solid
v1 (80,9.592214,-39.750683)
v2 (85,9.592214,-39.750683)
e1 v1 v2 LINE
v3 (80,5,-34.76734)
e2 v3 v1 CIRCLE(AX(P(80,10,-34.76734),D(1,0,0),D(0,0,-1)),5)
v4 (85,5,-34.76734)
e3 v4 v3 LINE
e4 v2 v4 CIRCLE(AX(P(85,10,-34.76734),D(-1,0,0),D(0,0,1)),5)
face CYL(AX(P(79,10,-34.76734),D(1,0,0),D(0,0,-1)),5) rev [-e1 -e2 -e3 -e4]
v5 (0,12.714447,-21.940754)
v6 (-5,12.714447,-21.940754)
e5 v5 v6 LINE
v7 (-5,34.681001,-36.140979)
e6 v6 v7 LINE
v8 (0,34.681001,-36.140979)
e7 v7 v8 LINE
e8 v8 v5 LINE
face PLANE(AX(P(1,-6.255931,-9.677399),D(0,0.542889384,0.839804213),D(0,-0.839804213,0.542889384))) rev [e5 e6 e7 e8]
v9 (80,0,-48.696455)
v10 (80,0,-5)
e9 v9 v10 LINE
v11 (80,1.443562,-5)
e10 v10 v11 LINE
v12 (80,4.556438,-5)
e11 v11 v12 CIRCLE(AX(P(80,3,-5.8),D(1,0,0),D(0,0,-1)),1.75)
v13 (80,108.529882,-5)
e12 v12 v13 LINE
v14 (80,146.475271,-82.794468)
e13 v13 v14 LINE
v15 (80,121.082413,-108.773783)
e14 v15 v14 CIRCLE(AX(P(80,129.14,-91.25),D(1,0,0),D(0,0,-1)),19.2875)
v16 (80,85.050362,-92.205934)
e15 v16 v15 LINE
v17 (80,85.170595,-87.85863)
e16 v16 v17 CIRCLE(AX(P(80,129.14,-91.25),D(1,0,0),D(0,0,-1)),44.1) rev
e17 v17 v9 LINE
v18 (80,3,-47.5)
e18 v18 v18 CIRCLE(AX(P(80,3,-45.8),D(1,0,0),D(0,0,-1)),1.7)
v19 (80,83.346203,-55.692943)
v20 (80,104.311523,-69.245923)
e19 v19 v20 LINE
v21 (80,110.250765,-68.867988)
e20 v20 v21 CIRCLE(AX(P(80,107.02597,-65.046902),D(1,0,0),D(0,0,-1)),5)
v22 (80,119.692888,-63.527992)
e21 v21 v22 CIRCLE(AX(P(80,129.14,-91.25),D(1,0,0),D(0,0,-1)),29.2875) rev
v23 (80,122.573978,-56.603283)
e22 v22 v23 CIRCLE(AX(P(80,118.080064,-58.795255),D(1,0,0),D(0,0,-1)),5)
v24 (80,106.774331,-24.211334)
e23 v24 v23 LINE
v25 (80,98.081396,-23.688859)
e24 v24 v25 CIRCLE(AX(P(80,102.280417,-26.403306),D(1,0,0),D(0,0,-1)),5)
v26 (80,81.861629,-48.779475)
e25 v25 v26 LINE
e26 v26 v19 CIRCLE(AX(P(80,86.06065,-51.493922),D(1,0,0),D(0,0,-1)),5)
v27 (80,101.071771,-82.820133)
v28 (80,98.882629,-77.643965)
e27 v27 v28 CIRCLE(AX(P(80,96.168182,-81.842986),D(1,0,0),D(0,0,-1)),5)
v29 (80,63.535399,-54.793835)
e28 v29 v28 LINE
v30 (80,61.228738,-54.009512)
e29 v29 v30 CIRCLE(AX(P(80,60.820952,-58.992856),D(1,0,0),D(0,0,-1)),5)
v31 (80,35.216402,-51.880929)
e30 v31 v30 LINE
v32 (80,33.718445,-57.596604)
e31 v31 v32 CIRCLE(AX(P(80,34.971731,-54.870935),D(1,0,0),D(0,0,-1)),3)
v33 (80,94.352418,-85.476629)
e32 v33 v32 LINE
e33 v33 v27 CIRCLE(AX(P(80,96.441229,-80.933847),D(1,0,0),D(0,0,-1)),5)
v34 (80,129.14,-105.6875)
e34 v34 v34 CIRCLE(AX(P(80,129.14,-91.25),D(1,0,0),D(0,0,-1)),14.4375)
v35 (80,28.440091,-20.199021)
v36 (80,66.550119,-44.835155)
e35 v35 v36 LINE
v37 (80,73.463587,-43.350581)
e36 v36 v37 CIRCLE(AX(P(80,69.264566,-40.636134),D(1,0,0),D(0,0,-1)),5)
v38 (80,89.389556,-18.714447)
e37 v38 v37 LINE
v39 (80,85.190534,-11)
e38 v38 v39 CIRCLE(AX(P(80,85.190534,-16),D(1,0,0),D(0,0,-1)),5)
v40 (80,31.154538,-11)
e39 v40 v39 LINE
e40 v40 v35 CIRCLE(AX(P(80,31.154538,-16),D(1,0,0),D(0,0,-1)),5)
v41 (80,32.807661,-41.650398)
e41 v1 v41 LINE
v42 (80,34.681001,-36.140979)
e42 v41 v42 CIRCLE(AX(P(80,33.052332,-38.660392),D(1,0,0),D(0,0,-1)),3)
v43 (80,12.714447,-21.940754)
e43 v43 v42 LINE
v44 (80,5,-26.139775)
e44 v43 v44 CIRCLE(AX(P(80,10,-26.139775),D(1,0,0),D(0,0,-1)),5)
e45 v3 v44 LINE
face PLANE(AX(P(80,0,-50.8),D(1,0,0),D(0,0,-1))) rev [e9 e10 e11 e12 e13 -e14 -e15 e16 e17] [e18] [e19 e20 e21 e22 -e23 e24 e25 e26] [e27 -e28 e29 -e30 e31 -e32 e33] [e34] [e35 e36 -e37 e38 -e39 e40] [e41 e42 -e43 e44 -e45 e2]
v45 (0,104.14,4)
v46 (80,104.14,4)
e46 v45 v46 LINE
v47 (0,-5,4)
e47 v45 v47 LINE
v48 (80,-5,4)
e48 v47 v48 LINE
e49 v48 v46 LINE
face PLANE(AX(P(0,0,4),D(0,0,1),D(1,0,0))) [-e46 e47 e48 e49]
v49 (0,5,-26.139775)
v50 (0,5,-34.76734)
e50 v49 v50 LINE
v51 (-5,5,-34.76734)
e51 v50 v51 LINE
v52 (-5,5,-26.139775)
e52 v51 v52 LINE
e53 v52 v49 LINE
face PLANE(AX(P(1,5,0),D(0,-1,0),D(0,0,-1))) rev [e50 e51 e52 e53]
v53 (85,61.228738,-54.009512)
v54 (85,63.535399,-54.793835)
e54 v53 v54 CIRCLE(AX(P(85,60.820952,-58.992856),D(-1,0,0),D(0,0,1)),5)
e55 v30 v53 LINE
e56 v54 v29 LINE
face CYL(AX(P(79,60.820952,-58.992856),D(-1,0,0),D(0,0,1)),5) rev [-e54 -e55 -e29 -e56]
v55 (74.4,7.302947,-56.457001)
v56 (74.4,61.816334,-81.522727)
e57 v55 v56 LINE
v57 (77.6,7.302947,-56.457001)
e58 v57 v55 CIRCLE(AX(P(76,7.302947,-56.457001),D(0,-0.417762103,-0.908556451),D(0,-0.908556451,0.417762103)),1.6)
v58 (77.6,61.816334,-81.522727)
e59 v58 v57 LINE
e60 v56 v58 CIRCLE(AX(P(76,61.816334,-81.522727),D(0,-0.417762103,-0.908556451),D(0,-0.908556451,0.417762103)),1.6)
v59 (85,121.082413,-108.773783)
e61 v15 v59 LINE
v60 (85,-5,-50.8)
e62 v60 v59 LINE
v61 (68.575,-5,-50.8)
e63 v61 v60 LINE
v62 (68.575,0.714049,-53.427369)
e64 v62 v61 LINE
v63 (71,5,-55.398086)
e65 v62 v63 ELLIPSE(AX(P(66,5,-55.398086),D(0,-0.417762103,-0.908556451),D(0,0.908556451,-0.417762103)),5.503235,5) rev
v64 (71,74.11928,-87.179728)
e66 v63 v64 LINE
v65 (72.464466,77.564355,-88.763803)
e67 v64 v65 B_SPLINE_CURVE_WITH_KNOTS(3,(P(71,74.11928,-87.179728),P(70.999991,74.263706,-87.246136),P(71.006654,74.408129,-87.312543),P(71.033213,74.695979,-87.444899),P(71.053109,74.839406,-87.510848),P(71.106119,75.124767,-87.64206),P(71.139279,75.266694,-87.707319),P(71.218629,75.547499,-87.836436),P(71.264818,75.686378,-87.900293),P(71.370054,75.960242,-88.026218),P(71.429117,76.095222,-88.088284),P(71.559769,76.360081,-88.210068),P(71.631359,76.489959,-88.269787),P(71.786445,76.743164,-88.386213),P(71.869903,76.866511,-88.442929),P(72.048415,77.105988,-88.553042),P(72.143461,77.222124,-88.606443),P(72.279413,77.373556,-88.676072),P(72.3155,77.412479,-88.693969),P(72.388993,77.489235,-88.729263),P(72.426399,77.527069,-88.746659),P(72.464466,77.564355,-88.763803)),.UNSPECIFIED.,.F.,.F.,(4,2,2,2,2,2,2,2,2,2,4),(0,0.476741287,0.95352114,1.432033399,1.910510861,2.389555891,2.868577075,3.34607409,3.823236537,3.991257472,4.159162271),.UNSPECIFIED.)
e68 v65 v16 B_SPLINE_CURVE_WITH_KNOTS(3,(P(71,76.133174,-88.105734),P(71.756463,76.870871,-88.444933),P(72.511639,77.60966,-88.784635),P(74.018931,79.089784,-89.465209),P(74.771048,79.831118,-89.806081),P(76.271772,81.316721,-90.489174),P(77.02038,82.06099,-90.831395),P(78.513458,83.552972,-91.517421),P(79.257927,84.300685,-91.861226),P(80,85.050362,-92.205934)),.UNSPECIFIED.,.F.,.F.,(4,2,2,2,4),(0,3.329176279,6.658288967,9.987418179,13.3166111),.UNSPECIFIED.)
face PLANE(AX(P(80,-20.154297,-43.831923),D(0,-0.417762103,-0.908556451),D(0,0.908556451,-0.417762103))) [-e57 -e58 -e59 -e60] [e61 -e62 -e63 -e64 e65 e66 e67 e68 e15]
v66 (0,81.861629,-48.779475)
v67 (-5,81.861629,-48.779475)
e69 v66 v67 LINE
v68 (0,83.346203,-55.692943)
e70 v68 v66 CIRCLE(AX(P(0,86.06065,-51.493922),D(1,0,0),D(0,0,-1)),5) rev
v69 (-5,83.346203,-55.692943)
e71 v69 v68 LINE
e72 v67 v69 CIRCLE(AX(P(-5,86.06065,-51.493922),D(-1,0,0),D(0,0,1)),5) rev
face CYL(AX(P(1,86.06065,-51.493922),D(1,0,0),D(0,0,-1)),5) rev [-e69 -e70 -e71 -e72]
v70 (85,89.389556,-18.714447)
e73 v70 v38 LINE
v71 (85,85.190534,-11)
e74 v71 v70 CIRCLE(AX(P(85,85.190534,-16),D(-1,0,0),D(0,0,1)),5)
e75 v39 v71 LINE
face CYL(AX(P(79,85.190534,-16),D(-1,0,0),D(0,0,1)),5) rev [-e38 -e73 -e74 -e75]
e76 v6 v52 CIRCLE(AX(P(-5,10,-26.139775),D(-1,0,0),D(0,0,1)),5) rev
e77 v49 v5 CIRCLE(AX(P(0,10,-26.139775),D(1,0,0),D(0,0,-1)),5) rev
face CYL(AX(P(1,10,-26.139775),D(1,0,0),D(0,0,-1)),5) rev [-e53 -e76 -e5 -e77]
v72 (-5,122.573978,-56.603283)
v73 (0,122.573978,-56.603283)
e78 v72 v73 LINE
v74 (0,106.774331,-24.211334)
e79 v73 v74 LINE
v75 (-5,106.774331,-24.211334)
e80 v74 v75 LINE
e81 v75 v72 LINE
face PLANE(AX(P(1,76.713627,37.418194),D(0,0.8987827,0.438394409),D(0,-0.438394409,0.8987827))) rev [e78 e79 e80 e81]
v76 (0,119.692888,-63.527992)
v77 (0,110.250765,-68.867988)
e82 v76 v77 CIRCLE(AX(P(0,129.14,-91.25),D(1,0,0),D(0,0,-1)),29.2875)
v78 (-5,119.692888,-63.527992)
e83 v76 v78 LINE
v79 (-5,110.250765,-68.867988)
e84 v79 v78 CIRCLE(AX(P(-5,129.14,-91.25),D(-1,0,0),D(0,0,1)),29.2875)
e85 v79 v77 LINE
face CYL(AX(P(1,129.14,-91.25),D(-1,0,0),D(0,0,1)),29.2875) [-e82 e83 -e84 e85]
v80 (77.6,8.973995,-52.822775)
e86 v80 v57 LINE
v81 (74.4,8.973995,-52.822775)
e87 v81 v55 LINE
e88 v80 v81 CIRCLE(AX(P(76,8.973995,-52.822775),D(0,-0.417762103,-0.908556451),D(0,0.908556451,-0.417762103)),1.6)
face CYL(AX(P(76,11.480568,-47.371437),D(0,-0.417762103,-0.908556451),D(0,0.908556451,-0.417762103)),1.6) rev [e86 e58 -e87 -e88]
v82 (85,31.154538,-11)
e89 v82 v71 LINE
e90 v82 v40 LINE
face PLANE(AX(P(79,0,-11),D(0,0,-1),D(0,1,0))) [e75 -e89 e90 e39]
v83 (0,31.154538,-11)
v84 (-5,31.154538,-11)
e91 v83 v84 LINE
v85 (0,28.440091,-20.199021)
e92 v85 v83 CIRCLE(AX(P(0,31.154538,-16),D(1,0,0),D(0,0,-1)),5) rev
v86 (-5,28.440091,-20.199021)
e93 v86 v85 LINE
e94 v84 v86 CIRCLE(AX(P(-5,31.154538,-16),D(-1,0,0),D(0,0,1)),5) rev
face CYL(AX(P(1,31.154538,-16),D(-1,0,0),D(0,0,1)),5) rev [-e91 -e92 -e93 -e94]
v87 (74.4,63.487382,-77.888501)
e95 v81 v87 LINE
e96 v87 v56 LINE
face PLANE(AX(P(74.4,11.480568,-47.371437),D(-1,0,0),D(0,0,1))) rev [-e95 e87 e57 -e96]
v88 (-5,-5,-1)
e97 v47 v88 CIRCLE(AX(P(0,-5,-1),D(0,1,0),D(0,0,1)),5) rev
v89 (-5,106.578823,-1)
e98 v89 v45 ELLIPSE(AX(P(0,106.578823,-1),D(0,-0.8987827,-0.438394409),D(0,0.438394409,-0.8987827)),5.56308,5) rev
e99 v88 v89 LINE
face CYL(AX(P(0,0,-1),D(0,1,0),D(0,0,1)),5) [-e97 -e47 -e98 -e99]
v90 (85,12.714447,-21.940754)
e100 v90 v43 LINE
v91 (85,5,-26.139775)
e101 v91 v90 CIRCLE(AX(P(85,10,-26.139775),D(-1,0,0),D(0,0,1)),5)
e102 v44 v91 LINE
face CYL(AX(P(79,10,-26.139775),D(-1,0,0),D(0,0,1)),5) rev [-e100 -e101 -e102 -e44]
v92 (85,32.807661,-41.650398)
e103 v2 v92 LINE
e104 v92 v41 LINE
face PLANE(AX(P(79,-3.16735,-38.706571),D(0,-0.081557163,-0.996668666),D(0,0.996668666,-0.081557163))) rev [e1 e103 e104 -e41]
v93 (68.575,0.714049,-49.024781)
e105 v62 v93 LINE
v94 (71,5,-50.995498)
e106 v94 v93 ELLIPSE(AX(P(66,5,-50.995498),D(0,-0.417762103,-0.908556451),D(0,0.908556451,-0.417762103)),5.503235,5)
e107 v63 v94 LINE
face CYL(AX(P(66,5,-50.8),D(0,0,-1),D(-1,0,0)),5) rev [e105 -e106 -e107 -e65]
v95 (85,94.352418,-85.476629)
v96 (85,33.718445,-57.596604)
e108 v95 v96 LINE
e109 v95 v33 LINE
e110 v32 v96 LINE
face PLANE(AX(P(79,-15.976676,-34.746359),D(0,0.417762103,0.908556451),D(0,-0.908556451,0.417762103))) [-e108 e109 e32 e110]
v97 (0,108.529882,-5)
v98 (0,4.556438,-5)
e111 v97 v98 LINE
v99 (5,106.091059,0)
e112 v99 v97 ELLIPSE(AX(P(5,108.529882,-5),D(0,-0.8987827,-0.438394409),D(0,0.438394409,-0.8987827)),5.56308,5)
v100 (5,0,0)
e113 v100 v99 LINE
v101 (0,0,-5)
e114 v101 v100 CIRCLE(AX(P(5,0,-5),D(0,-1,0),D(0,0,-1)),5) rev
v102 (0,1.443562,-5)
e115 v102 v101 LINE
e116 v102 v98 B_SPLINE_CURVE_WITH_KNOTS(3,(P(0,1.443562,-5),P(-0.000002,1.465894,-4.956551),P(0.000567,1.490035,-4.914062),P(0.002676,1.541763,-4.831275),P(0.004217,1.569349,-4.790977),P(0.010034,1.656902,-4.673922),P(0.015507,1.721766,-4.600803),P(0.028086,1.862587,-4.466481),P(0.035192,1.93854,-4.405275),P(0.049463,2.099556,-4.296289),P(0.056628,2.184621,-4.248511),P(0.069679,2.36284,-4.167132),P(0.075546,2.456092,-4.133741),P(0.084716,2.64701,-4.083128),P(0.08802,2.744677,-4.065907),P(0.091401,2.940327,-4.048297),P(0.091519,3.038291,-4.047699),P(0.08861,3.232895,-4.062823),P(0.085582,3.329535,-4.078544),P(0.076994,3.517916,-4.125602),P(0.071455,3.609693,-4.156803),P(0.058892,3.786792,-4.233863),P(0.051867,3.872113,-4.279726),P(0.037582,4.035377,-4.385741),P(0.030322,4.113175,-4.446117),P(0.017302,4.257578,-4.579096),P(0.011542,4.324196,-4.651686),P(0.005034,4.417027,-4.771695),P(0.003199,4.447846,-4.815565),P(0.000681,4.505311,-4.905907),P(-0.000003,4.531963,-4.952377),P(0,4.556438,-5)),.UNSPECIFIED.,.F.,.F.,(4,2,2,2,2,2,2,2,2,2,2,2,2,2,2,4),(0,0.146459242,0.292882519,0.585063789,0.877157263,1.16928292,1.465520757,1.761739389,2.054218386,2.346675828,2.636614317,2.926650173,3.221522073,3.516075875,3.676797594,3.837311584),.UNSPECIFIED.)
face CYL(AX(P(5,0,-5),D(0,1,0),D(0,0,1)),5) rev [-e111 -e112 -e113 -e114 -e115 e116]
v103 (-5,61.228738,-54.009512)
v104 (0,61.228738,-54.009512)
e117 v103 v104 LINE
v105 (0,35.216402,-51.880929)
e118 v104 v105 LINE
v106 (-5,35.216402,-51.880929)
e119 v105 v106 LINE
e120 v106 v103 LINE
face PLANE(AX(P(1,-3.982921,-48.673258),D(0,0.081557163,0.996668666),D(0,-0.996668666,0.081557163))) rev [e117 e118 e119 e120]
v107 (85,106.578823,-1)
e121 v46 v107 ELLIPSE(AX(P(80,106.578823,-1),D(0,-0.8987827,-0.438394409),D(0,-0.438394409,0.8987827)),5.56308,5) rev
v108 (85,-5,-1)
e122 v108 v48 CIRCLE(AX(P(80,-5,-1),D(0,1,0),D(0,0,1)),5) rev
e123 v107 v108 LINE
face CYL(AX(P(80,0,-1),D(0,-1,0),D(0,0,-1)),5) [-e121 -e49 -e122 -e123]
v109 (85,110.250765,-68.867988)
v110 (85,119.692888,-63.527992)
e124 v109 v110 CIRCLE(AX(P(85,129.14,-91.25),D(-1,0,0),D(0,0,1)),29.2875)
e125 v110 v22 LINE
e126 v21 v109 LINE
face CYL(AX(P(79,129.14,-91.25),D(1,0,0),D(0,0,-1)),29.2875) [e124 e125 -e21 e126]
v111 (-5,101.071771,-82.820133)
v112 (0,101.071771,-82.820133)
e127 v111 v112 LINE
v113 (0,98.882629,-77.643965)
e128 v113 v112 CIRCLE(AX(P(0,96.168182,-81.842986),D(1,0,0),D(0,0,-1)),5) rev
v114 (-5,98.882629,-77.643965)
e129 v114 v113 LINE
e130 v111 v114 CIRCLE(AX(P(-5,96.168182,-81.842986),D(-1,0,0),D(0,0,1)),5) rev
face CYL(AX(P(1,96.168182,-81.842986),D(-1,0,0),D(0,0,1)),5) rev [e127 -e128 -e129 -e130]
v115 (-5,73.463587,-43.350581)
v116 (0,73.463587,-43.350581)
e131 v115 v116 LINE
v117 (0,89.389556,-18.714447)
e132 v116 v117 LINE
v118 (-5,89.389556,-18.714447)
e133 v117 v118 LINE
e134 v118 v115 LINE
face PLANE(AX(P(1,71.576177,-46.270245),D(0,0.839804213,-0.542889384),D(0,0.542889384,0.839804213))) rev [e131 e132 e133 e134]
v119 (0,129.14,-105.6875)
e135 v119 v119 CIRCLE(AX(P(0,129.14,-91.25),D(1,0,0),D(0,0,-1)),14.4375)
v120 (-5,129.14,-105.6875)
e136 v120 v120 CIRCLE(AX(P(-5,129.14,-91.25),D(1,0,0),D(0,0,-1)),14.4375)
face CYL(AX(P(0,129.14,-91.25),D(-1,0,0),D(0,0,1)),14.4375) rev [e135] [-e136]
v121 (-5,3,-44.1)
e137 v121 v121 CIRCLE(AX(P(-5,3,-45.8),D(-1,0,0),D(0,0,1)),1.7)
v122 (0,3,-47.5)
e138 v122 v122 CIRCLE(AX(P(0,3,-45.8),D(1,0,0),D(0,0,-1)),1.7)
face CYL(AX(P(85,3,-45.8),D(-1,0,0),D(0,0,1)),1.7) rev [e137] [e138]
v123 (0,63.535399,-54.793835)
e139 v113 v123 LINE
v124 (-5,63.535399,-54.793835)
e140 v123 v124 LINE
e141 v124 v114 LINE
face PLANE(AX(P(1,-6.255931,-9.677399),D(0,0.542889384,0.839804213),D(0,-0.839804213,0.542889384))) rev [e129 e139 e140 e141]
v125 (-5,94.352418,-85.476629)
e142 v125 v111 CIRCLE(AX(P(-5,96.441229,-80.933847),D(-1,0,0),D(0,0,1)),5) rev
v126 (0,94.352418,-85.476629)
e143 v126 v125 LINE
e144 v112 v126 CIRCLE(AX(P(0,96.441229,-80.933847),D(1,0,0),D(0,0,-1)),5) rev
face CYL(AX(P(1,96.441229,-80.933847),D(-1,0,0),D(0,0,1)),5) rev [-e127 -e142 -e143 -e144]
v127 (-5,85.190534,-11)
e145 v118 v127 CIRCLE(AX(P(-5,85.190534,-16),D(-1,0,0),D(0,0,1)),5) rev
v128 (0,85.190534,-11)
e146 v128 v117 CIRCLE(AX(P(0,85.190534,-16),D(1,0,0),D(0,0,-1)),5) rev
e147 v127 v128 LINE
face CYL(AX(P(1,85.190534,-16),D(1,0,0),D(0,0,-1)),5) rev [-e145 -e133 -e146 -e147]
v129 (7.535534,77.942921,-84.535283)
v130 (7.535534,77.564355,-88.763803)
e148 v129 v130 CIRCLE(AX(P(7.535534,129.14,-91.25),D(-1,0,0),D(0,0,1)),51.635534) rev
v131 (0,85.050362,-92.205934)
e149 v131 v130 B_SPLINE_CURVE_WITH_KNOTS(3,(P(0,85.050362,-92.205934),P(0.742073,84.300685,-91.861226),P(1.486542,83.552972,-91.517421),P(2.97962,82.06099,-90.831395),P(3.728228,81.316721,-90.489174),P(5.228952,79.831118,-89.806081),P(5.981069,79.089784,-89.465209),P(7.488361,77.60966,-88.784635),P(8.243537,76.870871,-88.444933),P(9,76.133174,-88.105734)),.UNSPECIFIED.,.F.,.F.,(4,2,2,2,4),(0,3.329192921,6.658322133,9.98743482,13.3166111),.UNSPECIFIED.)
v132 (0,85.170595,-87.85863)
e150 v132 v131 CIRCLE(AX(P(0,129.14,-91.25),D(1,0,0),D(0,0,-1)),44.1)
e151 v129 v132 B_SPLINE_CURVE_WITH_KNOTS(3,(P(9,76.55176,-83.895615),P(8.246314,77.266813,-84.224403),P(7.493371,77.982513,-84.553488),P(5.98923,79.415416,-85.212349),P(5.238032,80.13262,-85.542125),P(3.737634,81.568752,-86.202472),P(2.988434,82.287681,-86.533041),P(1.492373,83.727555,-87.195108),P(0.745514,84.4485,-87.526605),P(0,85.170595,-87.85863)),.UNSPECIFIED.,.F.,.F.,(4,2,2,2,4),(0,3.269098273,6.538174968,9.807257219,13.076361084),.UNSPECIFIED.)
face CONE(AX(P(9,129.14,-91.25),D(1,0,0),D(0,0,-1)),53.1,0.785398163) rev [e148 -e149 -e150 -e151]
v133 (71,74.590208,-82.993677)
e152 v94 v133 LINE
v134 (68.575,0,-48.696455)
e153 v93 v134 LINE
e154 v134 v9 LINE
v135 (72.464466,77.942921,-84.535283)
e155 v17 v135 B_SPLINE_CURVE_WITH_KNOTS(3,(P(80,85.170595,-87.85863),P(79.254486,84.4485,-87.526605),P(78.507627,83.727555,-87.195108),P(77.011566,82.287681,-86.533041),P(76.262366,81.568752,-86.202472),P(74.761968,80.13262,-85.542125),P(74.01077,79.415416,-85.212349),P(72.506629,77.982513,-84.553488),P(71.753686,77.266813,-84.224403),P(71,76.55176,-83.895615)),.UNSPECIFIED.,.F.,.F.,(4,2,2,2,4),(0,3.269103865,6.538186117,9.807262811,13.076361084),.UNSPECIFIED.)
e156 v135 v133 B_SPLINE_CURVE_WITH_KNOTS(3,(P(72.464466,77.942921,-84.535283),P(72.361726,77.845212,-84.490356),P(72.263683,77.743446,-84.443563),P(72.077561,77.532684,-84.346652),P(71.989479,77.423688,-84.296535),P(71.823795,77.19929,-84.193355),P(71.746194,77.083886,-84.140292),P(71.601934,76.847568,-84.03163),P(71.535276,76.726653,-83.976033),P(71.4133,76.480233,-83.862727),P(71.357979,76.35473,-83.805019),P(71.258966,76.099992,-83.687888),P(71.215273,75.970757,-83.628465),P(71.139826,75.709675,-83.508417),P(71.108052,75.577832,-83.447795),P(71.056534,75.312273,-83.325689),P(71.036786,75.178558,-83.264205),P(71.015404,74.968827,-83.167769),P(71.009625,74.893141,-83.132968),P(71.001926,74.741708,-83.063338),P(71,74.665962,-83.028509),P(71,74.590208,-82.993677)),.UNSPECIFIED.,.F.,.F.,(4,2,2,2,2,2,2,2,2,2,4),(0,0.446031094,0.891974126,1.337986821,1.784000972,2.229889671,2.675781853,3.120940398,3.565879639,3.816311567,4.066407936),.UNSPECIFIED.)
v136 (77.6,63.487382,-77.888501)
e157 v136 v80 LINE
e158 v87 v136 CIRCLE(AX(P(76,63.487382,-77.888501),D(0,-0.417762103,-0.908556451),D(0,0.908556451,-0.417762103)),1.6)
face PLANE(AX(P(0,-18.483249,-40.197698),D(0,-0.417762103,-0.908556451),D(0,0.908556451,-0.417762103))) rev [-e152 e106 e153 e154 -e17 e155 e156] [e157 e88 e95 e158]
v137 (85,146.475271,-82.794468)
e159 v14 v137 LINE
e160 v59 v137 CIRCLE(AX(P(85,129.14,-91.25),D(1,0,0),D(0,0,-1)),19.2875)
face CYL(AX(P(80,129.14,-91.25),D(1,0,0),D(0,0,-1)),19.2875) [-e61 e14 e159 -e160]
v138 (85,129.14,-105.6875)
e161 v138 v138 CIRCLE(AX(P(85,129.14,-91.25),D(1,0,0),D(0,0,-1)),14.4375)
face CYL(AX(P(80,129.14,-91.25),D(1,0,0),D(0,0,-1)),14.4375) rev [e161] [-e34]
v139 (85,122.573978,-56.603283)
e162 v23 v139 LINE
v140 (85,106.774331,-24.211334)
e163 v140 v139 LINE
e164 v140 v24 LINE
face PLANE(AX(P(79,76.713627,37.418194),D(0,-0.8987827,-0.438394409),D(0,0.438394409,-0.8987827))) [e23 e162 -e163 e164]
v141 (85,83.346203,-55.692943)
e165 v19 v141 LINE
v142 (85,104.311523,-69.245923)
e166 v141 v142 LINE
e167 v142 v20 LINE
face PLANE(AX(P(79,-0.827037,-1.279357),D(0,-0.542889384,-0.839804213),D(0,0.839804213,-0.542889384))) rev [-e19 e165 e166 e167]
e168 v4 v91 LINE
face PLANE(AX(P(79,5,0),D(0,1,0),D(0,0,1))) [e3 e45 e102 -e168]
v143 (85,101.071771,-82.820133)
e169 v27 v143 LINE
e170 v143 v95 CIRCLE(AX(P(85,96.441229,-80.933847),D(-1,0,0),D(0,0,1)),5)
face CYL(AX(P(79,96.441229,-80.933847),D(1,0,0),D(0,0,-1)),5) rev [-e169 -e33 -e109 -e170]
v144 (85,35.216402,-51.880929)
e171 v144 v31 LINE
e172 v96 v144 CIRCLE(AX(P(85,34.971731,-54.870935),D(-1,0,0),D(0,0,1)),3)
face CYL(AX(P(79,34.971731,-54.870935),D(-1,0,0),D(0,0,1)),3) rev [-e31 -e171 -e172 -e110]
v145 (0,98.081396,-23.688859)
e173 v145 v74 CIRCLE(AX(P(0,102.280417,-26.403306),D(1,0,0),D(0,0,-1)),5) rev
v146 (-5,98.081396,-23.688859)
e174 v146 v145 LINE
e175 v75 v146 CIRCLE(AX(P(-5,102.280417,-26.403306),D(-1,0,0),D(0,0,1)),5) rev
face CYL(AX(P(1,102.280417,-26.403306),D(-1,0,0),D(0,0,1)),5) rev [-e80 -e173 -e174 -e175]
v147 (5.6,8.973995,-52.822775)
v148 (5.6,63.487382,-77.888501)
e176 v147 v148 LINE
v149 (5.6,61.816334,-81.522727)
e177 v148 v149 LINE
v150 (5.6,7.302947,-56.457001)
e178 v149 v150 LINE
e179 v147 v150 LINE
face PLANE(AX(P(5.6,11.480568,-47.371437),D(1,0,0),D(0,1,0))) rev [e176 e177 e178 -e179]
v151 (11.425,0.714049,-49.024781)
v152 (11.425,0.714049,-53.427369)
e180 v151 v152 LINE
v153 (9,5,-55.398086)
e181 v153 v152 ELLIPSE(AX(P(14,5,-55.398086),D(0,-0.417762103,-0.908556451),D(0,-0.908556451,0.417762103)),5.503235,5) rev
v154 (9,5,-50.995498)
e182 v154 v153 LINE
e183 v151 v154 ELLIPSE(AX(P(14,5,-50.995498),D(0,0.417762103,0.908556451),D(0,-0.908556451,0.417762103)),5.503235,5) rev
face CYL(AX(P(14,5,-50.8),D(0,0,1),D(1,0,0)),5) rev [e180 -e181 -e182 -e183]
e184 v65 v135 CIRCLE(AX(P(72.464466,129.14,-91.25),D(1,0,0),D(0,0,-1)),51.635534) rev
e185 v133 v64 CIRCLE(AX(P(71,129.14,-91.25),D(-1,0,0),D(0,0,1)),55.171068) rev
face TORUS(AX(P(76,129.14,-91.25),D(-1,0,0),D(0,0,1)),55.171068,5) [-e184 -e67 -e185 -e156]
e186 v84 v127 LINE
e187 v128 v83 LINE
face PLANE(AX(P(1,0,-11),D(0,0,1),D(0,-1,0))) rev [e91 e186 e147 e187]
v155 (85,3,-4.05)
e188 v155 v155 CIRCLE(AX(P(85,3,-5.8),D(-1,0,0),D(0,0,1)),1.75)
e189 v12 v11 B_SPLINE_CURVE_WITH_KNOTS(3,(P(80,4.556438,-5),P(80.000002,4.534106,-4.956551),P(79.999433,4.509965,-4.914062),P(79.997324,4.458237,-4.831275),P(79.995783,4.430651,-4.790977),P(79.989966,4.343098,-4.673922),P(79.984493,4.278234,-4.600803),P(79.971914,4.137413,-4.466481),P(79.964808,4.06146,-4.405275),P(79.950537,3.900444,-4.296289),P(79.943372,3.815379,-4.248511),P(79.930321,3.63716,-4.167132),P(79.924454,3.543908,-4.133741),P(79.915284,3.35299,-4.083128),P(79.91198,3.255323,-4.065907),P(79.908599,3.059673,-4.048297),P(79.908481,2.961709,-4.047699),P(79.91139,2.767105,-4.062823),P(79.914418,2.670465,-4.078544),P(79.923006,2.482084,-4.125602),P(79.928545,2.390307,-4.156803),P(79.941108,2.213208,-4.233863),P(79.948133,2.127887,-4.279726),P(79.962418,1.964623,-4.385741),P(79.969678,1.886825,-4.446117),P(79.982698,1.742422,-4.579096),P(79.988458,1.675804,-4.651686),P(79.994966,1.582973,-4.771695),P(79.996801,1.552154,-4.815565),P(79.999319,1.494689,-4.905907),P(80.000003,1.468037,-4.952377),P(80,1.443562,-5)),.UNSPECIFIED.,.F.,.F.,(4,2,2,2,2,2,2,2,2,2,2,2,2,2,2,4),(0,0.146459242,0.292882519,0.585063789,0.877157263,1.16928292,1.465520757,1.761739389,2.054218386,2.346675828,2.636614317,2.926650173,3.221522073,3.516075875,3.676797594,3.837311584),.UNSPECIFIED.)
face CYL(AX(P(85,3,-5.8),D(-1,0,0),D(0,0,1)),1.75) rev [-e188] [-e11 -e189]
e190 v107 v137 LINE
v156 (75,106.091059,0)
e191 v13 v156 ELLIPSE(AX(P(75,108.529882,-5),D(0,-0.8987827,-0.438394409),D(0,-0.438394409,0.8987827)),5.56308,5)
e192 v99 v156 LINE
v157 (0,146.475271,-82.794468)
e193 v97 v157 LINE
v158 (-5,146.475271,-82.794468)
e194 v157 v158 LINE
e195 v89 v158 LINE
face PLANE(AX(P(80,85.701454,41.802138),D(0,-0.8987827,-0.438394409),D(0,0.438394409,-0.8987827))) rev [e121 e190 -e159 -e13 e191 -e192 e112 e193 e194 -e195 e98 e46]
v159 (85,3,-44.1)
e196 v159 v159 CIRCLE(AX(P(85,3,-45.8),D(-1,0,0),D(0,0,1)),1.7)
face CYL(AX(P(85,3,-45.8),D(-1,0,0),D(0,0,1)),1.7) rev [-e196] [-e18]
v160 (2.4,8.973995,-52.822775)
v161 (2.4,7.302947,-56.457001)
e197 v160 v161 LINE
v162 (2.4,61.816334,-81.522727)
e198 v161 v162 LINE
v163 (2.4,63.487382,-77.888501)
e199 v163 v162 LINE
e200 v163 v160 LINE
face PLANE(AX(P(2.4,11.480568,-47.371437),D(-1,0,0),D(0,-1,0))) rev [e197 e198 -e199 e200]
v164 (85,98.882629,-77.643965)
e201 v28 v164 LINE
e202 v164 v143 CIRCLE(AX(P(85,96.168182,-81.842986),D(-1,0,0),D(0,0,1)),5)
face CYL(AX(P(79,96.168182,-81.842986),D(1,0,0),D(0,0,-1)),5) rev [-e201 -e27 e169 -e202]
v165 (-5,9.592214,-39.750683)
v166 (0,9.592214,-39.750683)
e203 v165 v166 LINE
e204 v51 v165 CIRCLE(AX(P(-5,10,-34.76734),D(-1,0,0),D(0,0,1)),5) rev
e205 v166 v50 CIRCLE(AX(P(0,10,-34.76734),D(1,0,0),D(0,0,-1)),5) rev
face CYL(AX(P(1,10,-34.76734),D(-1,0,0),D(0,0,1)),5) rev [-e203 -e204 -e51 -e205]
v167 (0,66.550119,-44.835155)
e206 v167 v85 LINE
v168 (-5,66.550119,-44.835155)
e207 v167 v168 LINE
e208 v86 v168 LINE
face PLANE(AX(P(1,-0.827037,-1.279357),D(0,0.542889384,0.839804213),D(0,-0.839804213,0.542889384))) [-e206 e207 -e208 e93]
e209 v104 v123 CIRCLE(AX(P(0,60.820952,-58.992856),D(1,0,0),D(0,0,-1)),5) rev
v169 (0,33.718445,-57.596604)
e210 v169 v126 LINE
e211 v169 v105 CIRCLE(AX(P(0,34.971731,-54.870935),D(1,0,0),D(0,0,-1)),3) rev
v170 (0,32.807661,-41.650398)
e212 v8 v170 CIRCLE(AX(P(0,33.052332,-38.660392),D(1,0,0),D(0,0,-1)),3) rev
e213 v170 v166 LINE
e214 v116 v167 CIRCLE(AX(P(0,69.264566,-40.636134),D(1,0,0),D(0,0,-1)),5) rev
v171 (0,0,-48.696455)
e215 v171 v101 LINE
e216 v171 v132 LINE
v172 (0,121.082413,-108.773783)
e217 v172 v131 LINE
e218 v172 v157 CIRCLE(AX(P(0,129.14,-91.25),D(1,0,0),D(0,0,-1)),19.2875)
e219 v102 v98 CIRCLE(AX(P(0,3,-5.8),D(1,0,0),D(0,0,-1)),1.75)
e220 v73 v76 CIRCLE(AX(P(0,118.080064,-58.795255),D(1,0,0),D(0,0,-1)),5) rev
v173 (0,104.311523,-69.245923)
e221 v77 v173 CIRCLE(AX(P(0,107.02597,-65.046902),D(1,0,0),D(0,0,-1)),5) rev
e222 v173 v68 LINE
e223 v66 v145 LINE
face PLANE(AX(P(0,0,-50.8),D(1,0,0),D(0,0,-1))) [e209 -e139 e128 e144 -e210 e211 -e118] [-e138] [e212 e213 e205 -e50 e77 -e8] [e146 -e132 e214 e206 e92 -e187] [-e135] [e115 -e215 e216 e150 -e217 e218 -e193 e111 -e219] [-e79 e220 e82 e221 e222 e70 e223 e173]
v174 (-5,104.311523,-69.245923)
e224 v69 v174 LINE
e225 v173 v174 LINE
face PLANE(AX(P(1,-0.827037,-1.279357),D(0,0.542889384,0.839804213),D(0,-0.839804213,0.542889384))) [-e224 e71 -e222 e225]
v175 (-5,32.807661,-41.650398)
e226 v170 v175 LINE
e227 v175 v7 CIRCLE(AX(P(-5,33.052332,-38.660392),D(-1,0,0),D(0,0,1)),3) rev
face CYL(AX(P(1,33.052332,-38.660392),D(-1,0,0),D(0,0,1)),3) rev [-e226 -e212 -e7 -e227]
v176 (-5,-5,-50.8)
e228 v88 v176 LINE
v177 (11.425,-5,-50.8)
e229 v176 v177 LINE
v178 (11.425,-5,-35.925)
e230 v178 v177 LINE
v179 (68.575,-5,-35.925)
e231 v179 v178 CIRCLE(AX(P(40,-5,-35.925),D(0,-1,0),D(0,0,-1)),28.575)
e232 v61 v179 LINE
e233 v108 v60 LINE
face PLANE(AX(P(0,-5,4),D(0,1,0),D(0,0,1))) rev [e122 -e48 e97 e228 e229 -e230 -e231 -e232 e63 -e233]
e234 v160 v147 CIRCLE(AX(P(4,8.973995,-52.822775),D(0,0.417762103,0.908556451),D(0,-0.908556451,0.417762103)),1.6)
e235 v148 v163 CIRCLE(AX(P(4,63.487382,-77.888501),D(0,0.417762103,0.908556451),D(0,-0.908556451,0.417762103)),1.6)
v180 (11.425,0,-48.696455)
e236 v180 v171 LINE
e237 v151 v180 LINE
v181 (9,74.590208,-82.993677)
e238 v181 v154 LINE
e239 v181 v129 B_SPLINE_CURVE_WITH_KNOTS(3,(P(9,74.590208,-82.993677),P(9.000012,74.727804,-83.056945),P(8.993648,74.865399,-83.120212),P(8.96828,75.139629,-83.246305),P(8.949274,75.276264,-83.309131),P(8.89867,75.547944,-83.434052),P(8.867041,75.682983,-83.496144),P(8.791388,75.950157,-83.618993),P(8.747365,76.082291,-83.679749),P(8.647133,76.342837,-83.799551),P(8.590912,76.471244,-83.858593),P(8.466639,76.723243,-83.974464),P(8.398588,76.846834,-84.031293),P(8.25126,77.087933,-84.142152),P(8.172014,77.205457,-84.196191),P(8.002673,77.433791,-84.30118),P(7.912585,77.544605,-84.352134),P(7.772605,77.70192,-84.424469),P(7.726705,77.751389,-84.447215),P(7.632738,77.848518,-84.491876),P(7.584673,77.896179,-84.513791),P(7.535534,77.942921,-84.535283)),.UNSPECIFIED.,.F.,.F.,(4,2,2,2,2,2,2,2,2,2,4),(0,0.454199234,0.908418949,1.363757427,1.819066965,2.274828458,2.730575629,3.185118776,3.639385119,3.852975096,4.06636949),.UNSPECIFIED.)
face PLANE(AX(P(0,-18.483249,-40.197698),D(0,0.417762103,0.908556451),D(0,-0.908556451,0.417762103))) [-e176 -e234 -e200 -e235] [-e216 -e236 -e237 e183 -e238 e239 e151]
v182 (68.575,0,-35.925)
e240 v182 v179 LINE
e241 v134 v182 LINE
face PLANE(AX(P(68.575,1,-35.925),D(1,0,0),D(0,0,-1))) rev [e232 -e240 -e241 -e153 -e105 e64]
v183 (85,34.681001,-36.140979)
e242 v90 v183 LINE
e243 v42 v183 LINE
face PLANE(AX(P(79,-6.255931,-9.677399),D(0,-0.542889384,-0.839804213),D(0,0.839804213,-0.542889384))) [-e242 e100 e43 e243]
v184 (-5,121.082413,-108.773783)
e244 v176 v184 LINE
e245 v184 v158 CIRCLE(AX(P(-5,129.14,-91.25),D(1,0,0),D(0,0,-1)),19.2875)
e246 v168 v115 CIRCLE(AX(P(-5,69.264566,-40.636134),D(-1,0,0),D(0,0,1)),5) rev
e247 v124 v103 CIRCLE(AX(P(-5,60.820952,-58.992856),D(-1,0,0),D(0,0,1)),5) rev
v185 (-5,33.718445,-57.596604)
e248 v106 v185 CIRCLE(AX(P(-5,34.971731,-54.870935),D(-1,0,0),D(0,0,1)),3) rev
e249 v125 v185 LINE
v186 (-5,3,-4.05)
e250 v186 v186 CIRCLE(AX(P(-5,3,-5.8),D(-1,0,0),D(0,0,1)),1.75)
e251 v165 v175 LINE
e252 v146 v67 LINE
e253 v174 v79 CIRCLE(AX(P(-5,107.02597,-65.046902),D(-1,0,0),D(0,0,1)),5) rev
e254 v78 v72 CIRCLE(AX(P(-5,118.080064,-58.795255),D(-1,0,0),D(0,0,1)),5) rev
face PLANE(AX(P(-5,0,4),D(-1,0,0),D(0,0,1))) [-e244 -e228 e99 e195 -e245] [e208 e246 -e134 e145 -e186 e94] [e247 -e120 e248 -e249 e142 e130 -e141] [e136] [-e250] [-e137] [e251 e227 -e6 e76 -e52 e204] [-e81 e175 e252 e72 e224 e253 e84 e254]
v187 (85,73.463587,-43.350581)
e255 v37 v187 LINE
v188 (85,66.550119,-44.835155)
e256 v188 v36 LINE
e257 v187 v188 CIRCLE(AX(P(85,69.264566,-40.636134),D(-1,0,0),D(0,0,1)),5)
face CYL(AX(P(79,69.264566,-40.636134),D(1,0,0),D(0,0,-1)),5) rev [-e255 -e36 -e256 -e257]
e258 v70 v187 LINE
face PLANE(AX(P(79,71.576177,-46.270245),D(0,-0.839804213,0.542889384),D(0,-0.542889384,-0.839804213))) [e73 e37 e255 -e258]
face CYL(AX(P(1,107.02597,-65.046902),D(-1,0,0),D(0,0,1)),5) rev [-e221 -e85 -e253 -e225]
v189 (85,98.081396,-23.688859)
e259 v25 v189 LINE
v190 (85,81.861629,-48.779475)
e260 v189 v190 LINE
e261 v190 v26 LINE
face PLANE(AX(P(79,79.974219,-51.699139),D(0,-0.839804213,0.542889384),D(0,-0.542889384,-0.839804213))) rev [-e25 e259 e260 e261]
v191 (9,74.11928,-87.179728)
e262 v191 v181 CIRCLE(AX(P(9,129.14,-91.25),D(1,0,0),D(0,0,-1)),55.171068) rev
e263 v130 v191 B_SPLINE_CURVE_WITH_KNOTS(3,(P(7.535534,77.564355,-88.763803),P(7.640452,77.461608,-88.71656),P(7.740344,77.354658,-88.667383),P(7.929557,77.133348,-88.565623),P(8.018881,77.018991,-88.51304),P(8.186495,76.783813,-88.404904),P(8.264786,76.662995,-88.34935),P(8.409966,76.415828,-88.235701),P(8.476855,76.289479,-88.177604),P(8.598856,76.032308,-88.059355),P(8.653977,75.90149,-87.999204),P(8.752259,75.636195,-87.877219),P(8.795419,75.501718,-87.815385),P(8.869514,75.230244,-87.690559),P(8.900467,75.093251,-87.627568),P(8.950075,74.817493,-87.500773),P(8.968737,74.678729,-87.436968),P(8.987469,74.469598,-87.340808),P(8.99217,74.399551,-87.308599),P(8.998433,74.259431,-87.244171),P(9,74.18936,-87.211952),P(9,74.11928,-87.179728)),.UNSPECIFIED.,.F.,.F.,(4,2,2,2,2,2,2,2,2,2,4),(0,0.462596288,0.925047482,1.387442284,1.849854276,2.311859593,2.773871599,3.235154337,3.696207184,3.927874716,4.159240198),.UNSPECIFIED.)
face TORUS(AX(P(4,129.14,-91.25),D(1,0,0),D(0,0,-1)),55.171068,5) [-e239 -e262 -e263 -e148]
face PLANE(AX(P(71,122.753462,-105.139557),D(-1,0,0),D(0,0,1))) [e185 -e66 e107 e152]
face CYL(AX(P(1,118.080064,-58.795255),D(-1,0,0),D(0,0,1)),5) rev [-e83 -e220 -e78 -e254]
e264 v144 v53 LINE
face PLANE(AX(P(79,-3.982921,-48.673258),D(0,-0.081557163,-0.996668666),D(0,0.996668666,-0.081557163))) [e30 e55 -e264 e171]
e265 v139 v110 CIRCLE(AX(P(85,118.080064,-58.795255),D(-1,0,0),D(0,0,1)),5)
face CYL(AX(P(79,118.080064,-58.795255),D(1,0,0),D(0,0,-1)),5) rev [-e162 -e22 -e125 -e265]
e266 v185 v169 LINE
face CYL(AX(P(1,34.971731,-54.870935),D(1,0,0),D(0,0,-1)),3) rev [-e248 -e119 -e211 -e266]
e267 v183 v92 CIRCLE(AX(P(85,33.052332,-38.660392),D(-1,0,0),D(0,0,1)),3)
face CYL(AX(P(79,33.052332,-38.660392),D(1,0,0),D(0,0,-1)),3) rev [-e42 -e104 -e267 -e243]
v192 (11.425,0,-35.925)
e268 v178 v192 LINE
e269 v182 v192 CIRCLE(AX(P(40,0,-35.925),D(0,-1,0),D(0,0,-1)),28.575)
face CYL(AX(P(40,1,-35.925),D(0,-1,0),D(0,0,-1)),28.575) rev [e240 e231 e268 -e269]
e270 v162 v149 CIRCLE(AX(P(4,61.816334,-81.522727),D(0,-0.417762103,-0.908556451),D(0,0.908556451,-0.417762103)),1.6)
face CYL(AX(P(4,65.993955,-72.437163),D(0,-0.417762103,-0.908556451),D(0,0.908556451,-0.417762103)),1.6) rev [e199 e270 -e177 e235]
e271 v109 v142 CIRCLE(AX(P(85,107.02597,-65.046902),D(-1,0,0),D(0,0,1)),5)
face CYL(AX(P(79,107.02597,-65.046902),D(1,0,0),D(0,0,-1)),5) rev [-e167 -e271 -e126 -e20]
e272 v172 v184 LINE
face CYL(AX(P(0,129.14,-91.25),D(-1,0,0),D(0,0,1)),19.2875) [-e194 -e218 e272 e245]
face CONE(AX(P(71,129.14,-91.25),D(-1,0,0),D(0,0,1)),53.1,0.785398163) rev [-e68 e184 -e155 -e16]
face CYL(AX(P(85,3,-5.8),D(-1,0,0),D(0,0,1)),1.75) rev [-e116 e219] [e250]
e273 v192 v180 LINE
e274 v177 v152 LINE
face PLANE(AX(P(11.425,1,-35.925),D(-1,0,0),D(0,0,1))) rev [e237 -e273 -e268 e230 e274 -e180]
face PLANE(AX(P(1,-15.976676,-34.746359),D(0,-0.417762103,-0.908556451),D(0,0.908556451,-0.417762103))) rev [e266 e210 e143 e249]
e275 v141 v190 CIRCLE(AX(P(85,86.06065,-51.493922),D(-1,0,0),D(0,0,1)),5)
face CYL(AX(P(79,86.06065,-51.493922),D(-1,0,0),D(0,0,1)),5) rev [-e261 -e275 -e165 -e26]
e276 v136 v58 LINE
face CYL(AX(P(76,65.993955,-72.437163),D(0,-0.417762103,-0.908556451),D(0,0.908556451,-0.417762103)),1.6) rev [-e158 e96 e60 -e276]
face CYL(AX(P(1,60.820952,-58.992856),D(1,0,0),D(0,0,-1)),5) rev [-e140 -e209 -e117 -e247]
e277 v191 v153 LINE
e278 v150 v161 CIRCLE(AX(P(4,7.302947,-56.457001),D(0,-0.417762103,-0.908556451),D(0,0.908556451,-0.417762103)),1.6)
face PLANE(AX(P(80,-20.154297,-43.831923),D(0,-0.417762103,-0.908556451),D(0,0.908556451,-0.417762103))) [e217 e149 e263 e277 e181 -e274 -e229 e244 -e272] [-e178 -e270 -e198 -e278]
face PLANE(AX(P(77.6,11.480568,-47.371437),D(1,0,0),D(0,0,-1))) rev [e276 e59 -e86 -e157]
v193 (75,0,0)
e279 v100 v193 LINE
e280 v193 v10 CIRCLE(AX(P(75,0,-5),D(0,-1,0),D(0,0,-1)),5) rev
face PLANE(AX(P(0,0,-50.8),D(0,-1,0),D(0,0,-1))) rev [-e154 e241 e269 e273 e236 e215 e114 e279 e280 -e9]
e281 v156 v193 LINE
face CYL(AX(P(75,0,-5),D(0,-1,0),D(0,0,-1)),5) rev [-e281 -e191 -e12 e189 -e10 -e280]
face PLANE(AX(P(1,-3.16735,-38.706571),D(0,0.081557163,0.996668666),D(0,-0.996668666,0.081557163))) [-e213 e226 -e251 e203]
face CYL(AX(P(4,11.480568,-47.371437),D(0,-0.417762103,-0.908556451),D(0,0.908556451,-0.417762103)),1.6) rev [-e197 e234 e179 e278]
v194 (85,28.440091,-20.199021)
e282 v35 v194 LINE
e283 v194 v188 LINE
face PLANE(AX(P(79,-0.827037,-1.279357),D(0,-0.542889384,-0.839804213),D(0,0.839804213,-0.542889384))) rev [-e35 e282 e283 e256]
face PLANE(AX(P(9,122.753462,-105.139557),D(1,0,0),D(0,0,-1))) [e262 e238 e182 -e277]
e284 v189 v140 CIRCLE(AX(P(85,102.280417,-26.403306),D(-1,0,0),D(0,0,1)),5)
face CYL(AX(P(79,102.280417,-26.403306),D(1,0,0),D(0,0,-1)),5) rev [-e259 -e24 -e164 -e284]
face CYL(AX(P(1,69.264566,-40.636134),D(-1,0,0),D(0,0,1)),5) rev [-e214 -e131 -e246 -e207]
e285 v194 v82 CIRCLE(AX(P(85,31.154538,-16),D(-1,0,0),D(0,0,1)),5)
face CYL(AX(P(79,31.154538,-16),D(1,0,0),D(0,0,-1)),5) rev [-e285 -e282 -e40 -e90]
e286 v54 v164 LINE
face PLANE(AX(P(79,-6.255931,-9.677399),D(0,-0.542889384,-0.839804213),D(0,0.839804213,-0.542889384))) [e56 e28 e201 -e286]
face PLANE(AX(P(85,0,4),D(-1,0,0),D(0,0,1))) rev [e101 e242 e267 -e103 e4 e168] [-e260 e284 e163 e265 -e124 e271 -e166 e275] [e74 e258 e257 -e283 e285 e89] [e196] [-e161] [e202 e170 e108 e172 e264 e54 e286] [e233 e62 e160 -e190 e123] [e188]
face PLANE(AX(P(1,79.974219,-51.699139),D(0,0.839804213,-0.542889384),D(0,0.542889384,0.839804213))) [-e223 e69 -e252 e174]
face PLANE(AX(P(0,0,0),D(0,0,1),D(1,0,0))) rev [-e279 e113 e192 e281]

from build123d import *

# Parameters (mm, degrees)
SKETCH1_W            = 80
SKETCH1_H            = 104.14
BOSS_EXTRUDE1_DEPTH  = 4
BOSS_EXTRUDE2_DEPTH  = 50.8
SKETCH3_R            = 19.2875
SKETCH3_R_2          = 14.4375
BOSS_EXTRUDE3_DEPTH  = 5
BOSS_EXTRUDE4_DEPTH  = 80
SKETCH5_W            = 9
SKETCH5_H            = 138.232865643
SKETCH5_H_2          = 136.811211048
BOSS_EXTRUDE10_DEPTH = 4
CHAMFER2_SIZE        = 15
FILLET2_R            = 5
FILLET3_R            = 5
CUT_EXTRUDE1_REACH   = 205.652
SKETCH6_R            = 38.1
CHAMFER3_SIZE        = 15
FILLET4_R            = 5
SKETCH9_R            = 28.575
CUT_EXTRUDE6_DEPTH   = 6
SKETCH10_W           = 57.15
SKETCH10_H           = 24.031141128
CUT_EXTRUDE7_DEPTH   = 6
FILLET6_R            = 5
FILLET7_R            = 5
CUT_EXTRUDE8_DEPTH   = 6
FILLET8_START        = -5
FILLET8_DEPTH        = 5
FILLET9_R            = 3
FILLET9_OF_MIRROR3_R = 3
CUT_EXTRUDE9_DEPTH   = 10
SKETCH13_R           = 1.7
SKETCH13_R_2         = 1.75
CUT_EXTRUDE10_DEPTH  = 206.789362409


with BuildPart() as part:
    # Sketch1 → Boss-Extrude1 (new body)
    with BuildSketch(Plane.XY):
        Polygon((80, 104.14), (85, 104.14), (85, -5), (-5, -5), (-5, 104.14), (0, 104.14), (0, 0), (80, 0), align=None)
        with Locations((40, 52.07)):
            Rectangle(SKETCH1_W, SKETCH1_H)
    extrude(amount=BOSS_EXTRUDE1_DEPTH)

    # Sketch1<3> → Boss-Extrude2 (add)
    with BuildSketch(Plane.XY):
        Polygon((80, 104.14), (85, 104.14), (85, -5), (-5, -5), (-5, 104.14), (0, 104.14), (0, 0), (80, 0), align=None)
    extrude(amount=-BOSS_EXTRUDE2_DEPTH)

    # Sketch3 → Boss-Extrude3 (add)
    # profile 1 of 2: a face of its own
    with BuildSketch(Plane(origin=(85, 0, 0), x_dir=(0, 0, -1), z_dir=(1, 0, 0))):
        with Locations((91.25, 129.14)):
            Circle(SKETCH3_R)
        with Locations((91.25, 129.14)):
            Circle(SKETCH3_R_2, mode=Mode.SUBTRACT)
    # profile 2 of 2: a face of its own
    with BuildSketch(Plane(origin=(85, 0, 0), x_dir=(0, 0, -1), z_dir=(1, 0, 0))):
        with BuildLine():
            Line((82.794467828, 146.475271326), (-4, 104.14))
            Line((-4, 104.14), (50.8, 104.14))
            Line((50.8, 104.14), (50.8, -5))
            Line((50.8, -5), (108.773782558, 121.082413443))
            ThreePointArc((108.773782558, 121.082413443), (77.768249404, 115.346883705), (82.794467828, 146.475271326))
        make_face()
    boss_extrude3 = extrude(amount=-BOSS_EXTRUDE3_DEPTH)

    # Mirror1: Boss-Extrude3 across plane
    add(boss_extrude3.mirror(Plane.ZY.offset(-40)))

    # Sketch4 → Boss-Extrude4 (add)
    with BuildSketch(Plane.ZY.offset(-80)):
        Polygon((-50.8, -5), (-50.8, 0), (-53.09904318, 0), align=None)
        Polygon((0, 106.091058513), (0, 104.14), (4, 104.14), align=None)
    extrude(amount=BOSS_EXTRUDE4_DEPTH)

    # Sketch5 → Boss-Extrude10 (add)
    with BuildSketch(Plane(origin=(0, -20.154296917, -43.831923404), x_dir=(-1, 0, 0), z_dir=(0, -0.41776210274368286, -0.9085564514718811))):
        with Locations((-75.5, 86.335339197)):
            Rectangle(SKETCH5_W, SKETCH5_H)
        with Locations((-4.5, 87.046166494)):
            Rectangle(SKETCH5_W, SKETCH5_H_2)
    extrude(amount=-BOSS_EXTRUDE10_DEPTH)

    # Chamfer2
    # the kernel refuses this chamfer: 15 mm, written as the material it takes off along each edge
    with BuildSketch(Plane(origin=(9, 104.967138054, -143.821570106), x_dir=(-1, 0, 0), z_dir=(0, 0.41776210274368286, 0.9085564514718811))) as chamfer2_piece_1_section:
        Polygon((CHAMFER2_SIZE, 0), (0, CHAMFER2_SIZE), (0, 0), align=None)
    chamfer2_piece_1 = extrude(amount=81.150489639, mode=Mode.PRIVATE)
    chamfer2_piece_1 = split(chamfer2_piece_1, bisect_by=Plane(origin=(0, 104.967138054, -143.821570106), z_dir=(1, 0, 0)), keep=Keep.TOP, mode=Mode.PRIVATE)
    add(chamfer2_piece_1, mode=Mode.SUBTRACT)
    with BuildSketch(Plane(origin=(71, 104.967138054, -143.821570106), x_dir=(0, -0.908556451471881, 0.41776210274368286), z_dir=(0, 0.41776210274368286, 0.9085564514718811))) as chamfer2_piece_2_section:
        Polygon((CHAMFER2_SIZE, 0), (0, CHAMFER2_SIZE), (0, 0), align=None)
    chamfer2_piece_2 = extrude(amount=81.150489639, mode=Mode.PRIVATE)
    chamfer2_piece_2 = split(chamfer2_piece_2, bisect_by=Plane(origin=(80, 104.967138054, -143.821570106), z_dir=(-1, 0, 0)), keep=Keep.TOP, mode=Mode.PRIVATE)
    add(chamfer2_piece_2, mode=Mode.SUBTRACT)

    # Fillet2
    fillet2_edges = [part.edges().sort_by_distance(p)[0] for p in [
        (9, 108.289590877, -100.690238114),
        (71, 108.289590877, -100.690238114),
    ]]
    fillet(fillet2_edges, radius=FILLET2_R)

    # Fillet3
    fillet3_edges = [part.edges().sort_by_distance(p)[0] for p in [
        (71, 0, -50.897749032),
        (9, 0, -50.897749032),
    ]]
    fillet(fillet3_edges, radius=FILLET3_R)

    # Cut-Extrude1: up to this face of the body (flat: up to its plane)
    cut_extrude1_end = Plane(part.part.faces().sort_by_distance((80, 71.429769016, -42.89325433))[0])
    # Sketch6 → Cut-Extrude1 (cut, up to the picked face)
    with BuildSketch(Plane(origin=(0, 0, 0), x_dir=(0, 0, -1), z_dir=(1, 0, 0)), mode=Mode.PRIVATE) as cut_extrude1_sk1:
        with Locations((91.25, 129.14)):
            Circle(SKETCH6_R)
    cut_extrude1_tool1 = split(extrude(cut_extrude1_sk1.sketch, amount=CUT_EXTRUDE1_REACH, mode=Mode.PRIVATE), bisect_by=cut_extrude1_end, keep=Keep.BOTH, mode=Mode.PRIVATE)
    add(cut_extrude1_tool1.solids().sort_by(Axis((0, 129.14, -91.25), (1, 0, 0)))[0], mode=Mode.SUBTRACT)

    # Chamfer3
    # the kernel refuses this chamfer: 15 mm, written as the material it takes off along each edge
    with BuildSketch(Plane(origin=(71, 129.14, -91.25), x_dir=(0, -0.4425940330110398, -0.8967220985026645), z_dir=(0, 0.8967220985026645, -0.4425940330110398))) as chamfer3_piece_1_section:
        Polygon((38.1 + CHAMFER3_SIZE, 0), (38.1, -CHAMFER3_SIZE), (38.1, 0), align=None)
    chamfer3_piece_1 = revolve(axis=Axis((71, 129.14, -91.25), (-1, 0, 0)), revolution_arc=122.778328336, mode=Mode.PRIVATE)
    chamfer3_piece_1 = split(chamfer3_piece_1, bisect_by=Plane(origin=(80, 129.14, -91.25), z_dir=(-1, 0, 0)), keep=Keep.TOP, mode=Mode.PRIVATE)
    add(chamfer3_piece_1, mode=Mode.SUBTRACT)
    with BuildSketch(Plane(origin=(9, 129.14, -91.25), x_dir=(0, -0.4425940330110398, -0.8967220985026645), z_dir=(0, 0.8967220985026645, -0.4425940330110398))) as chamfer3_piece_2_section:
        Polygon((38.1 + CHAMFER3_SIZE, 0), (38.1, CHAMFER3_SIZE), (38.1, 0), align=None)
    chamfer3_piece_2 = revolve(axis=Axis((9, 129.14, -91.25), (-1, 0, 0)), revolution_arc=122.778328336, mode=Mode.PRIVATE)
    chamfer3_piece_2 = split(chamfer3_piece_2, bisect_by=Plane(origin=(0, 129.14, -91.25), z_dir=(1, 0, 0)), keep=Keep.TOP, mode=Mode.PRIVATE)
    add(chamfer3_piece_2, mode=Mode.SUBTRACT)

    # Fillet4
    fillet4_edges = [part.edges().sort_by_distance(p)[0] for p in [
        (71, 76.300518744, -85.996503963),
        (9, 76.300518744, -85.996503963),
    ]]
    fillet(fillet4_edges, radius=FILLET4_R)

    # Sketch9 → Cut-Extrude6 (cut)
    with BuildSketch(Plane.XZ.offset(5)):
        with Locations((40, -35.925)):
            Circle(SKETCH9_R)
    extrude(amount=-CUT_EXTRUDE6_DEPTH, mode=Mode.SUBTRACT)

    # Sketch10 → Cut-Extrude7 (cut)
    with BuildSketch(Plane.XZ.offset(5)):
        with Locations((40, -47.940570564)):
            Rectangle(SKETCH10_W, SKETCH10_H)
    extrude(amount=-CUT_EXTRUDE7_DEPTH, mode=Mode.SUBTRACT)

    # Fillet6
    fillet6_edges = [part.edges().sort_by_distance(p)[0] for p in [
        (80, 53.045529256, 0),
        (0, 53.045529256, 0),
    ]]
    fillet(fillet6_edges, radius=FILLET6_R)

    # Fillet7
    fillet7_edges = [part.edges().sort_by_distance(p)[0] for p in [
        (-5, 49.57, 4),
        (85, 49.57, 4),
    ]]
    fillet(fillet7_edges, radius=FILLET7_R)

    # Sketch11 → Cut-Extrude8 (cut)
    with BuildSketch(Plane.ZY.offset(5)):
        with BuildLine():
            ThreePointArc((-79.782568565, 102.190868798), (-83.853758277, 100.801805551), (-88.084504322, 100.024071484))
            Line((-88.084504322, 100.024071484), (-50.49441088, 18.272467678))
            Line((-50.49441088, 18.272467678), (-53.351511937, 53.187648584))
            Line((-53.351511937, 53.187648584), (-53.717955782, 57.665772695))
            Line((-53.717955782, 57.665772695), (-54.111950484, 62.480581838))
            Line((-54.111950484, 62.480581838), (-79.782568565, 102.190868798))
        make_face()
        Polygon((-39.408272291, 5.407785815), (-42.624386734, 44.71028696), (-16.953768653, 5), (-39.408272291, 5), align=None)
        Polygon((-11, 14.209979321), (-11, 94.376540909), (-47.549602253, 70.749139742), align=None)
        with BuildLine():
            ThreePointArc((-62.21392357, 125.310649948), (-65.248417903, 115.661298849), (-71.384526431, 107.619762638))
            Line((-71.384526431, 107.619762638), (-52.978496093, 79.147181876))
            Line((-52.978496093, 79.147181876), (-16.249254698, 102.890710327))
            Line((-16.249254698, 102.890710327), (-62.21392357, 125.310649948))
        make_face()
    cut_extrude8 = extrude(amount=-CUT_EXTRUDE8_DEPTH, mode=Mode.SUBTRACT)

    # Fillet8: read off the stored shape, not the designer's step
    # Fillet8 outline → Fillet8 (add)
    with BuildSketch(Plane.YZ.offset(FILLET8_START)):
        with BuildLine():
            ThreePointArc((61.228738224, -54.009512415), (62.430571825, -54.259027975), (63.535399329, -54.793834676))
            Line((63.535399329, -54.793834676), (62.480581838, -54.111950484))
            Line((62.480581838, -54.111950484), (61.228738224, -54.009512415))
        make_face()
        with BuildLine():
            Line((102.190868798, -79.782568565), (98.882629402, -77.643965282))
            ThreePointArc((98.882629402, -77.643965282), (100.773266088, -79.895371145), (101.071771481, -82.820132668))
            ThreePointArc((101.071771481, -82.820132668), (98.279527982, -85.583648622), (94.352418228, -85.476629174))
            Line((94.352418228, -85.476629174), (100.024071484, -88.084504322))
            ThreePointArc((100.024071484, -88.084504322), (100.801805551, -83.853758277), (102.190868798, -79.782568565))
        make_face()
        with BuildLine():
            ThreePointArc((5, -26.139775101), (7.609627079, -21.748178888), (12.71444692, -21.940754035))
            Line((12.71444692, -21.940754035), (5, -16.953768653))
            Line((5, -16.953768653), (5, -26.139775101))
        make_face()
        with BuildLine():
            ThreePointArc((9.592214185, -39.750683082), (6.323117552, -38.15563364), (5, -34.767339754))
            Line((5, -34.767339754), (5, -39.408272291))
            Line((5, -39.408272291), (5.407785815, -39.408272291))
            Line((5.407785815, -39.408272291), (9.592214185, -39.750683082))
        make_face()
        with BuildLine():
            Line((14.209979321, -11), (28.440091162, -20.199021067))
            ThreePointArc((28.440091162, -20.199021067), (26.358961718, -14.584921439), (31.154538082, -11))
            Line((31.154538082, -11), (14.209979321, -11))
        make_face()
        with BuildLine():
            ThreePointArc((73.463586662, -43.350581187), (70.314318041, -45.524694362), (66.550118675, -44.835155334))
            Line((66.550118675, -44.835155334), (70.749139742, -47.549602253))
            Line((70.749139742, -47.549602253), (73.463586662, -43.350581187))
        make_face()
        with BuildLine():
            Line((94.376540909, -11), (85.19053446, -11))
            ThreePointArc((85.19053446, -11), (89.582130673, -13.609627079), (89.389555527, -18.71444692))
            Line((89.389555527, -18.71444692), (94.376540909, -11))
        make_face()
        with BuildLine():
            Line((102.890710327, -16.249254698), (98.081396321, -23.688858944))
            ThreePointArc((98.081396321, -23.688858944), (102.580393028, -21.412312514), (106.774330888, -24.211333816))
            Line((106.774330888, -24.211333816), (102.890710327, -16.249254698))
        make_face()
        with BuildLine():
            ThreePointArc((83.346202943, -55.692943013), (81.172089767, -52.543674393), (81.861628795, -48.779475026))
            Line((81.861628795, -48.779475026), (79.147181876, -52.978496093))
            Line((79.147181876, -52.978496093), (83.346202943, -55.692943013))
        make_face()
        with BuildLine():
            Line((125.310649948, -62.21392357), (122.573977862, -56.603282846))
            ThreePointArc((122.573977862, -56.603282846), (122.696443672, -60.715942807), (119.692887641, -63.527992058))
            ThreePointArc((119.692887641, -63.527992058), (122.469332302, -62.732288859), (125.310649948, -62.21392357))
        make_face()
        with BuildLine():
            ThreePointArc((110.250764888, -68.867988179), (107.343495643, -70.036809652), (104.311523242, -69.245923148))
            Line((104.311523242, -69.245923148), (107.619762638, -71.384526431))
            ThreePointArc((107.619762638, -71.384526431), (108.896121725, -70.085334903), (110.250764888, -68.867988179))
        make_face()
    fillet8 = extrude(amount=FILLET8_DEPTH)

    # Fillet9
    fillet9_edges = [part.edges().sort_by_distance(p)[0] for p in [
        (-2.5, 44.71028696, -42.624386734),
        (-2.5, 18.272467678, -50.49441088),
    ]]
    fillet(fillet9_edges, radius=FILLET9_R)

    # Mirror3: Cut-Extrude8, Fillet8 across plane
    add(cut_extrude8.mirror(Plane.ZY.offset(-40)), mode=Mode.SUBTRACT)
    add(fillet8.mirror(Plane.ZY.offset(-40)))

    # Fillet9 of Mirror3
    fillet9_of_mirror3_edges = [part.edges().sort_by_distance(p)[0] for p in [
        (82.5, 44.71028696, -42.624386734),
        (82.5, 18.272467678, -50.49441088),
    ]]
    fillet(fillet9_of_mirror3_edges, radius=FILLET9_OF_MIRROR3_R)

    # Sketch12 → Cut-Extrude9 (cut)
    with BuildSketch(Plane(origin=(0, -20.154296917, -43.831923404), x_dir=(-1, 0, 0), z_dir=(0, -0.41776210274368286, -0.9085564514718811))):
        with BuildLine():
            Line((-5.6, 30.22073467), (-5.6, 90.22073467))
            ThreePointArc((-5.6, 90.22073467), (-4, 91.82073467), (-2.4, 90.22073467))
            Line((-2.4, 90.22073467), (-2.4, 30.22073467))
            ThreePointArc((-2.4, 30.22073467), (-4, 28.62073467), (-5.6, 30.22073467))
        make_face()
        with BuildLine():
            Line((-74.4, 30.22073467), (-74.4, 90.22073467))
            ThreePointArc((-74.4, 90.22073467), (-76, 91.82073467), (-77.6, 90.22073467))
            Line((-77.6, 90.22073467), (-77.6, 30.22073467))
            ThreePointArc((-77.6, 30.22073467), (-76, 28.62073467), (-74.4, 30.22073467))
        make_face()
    extrude(amount=-CUT_EXTRUDE9_DEPTH, mode=Mode.SUBTRACT)

    # Sketch13 → Cut-Extrude10 (cut, through all)
    with BuildSketch(Plane.ZY.offset(5)):
        with Locations((-45.8, 3)):
            Circle(SKETCH13_R)
        with Locations((-5.8, 3)):
            Circle(SKETCH13_R_2)
    extrude(amount=-CUT_EXTRUDE10_DEPTH, mode=Mode.SUBTRACT)


solid = part.part
